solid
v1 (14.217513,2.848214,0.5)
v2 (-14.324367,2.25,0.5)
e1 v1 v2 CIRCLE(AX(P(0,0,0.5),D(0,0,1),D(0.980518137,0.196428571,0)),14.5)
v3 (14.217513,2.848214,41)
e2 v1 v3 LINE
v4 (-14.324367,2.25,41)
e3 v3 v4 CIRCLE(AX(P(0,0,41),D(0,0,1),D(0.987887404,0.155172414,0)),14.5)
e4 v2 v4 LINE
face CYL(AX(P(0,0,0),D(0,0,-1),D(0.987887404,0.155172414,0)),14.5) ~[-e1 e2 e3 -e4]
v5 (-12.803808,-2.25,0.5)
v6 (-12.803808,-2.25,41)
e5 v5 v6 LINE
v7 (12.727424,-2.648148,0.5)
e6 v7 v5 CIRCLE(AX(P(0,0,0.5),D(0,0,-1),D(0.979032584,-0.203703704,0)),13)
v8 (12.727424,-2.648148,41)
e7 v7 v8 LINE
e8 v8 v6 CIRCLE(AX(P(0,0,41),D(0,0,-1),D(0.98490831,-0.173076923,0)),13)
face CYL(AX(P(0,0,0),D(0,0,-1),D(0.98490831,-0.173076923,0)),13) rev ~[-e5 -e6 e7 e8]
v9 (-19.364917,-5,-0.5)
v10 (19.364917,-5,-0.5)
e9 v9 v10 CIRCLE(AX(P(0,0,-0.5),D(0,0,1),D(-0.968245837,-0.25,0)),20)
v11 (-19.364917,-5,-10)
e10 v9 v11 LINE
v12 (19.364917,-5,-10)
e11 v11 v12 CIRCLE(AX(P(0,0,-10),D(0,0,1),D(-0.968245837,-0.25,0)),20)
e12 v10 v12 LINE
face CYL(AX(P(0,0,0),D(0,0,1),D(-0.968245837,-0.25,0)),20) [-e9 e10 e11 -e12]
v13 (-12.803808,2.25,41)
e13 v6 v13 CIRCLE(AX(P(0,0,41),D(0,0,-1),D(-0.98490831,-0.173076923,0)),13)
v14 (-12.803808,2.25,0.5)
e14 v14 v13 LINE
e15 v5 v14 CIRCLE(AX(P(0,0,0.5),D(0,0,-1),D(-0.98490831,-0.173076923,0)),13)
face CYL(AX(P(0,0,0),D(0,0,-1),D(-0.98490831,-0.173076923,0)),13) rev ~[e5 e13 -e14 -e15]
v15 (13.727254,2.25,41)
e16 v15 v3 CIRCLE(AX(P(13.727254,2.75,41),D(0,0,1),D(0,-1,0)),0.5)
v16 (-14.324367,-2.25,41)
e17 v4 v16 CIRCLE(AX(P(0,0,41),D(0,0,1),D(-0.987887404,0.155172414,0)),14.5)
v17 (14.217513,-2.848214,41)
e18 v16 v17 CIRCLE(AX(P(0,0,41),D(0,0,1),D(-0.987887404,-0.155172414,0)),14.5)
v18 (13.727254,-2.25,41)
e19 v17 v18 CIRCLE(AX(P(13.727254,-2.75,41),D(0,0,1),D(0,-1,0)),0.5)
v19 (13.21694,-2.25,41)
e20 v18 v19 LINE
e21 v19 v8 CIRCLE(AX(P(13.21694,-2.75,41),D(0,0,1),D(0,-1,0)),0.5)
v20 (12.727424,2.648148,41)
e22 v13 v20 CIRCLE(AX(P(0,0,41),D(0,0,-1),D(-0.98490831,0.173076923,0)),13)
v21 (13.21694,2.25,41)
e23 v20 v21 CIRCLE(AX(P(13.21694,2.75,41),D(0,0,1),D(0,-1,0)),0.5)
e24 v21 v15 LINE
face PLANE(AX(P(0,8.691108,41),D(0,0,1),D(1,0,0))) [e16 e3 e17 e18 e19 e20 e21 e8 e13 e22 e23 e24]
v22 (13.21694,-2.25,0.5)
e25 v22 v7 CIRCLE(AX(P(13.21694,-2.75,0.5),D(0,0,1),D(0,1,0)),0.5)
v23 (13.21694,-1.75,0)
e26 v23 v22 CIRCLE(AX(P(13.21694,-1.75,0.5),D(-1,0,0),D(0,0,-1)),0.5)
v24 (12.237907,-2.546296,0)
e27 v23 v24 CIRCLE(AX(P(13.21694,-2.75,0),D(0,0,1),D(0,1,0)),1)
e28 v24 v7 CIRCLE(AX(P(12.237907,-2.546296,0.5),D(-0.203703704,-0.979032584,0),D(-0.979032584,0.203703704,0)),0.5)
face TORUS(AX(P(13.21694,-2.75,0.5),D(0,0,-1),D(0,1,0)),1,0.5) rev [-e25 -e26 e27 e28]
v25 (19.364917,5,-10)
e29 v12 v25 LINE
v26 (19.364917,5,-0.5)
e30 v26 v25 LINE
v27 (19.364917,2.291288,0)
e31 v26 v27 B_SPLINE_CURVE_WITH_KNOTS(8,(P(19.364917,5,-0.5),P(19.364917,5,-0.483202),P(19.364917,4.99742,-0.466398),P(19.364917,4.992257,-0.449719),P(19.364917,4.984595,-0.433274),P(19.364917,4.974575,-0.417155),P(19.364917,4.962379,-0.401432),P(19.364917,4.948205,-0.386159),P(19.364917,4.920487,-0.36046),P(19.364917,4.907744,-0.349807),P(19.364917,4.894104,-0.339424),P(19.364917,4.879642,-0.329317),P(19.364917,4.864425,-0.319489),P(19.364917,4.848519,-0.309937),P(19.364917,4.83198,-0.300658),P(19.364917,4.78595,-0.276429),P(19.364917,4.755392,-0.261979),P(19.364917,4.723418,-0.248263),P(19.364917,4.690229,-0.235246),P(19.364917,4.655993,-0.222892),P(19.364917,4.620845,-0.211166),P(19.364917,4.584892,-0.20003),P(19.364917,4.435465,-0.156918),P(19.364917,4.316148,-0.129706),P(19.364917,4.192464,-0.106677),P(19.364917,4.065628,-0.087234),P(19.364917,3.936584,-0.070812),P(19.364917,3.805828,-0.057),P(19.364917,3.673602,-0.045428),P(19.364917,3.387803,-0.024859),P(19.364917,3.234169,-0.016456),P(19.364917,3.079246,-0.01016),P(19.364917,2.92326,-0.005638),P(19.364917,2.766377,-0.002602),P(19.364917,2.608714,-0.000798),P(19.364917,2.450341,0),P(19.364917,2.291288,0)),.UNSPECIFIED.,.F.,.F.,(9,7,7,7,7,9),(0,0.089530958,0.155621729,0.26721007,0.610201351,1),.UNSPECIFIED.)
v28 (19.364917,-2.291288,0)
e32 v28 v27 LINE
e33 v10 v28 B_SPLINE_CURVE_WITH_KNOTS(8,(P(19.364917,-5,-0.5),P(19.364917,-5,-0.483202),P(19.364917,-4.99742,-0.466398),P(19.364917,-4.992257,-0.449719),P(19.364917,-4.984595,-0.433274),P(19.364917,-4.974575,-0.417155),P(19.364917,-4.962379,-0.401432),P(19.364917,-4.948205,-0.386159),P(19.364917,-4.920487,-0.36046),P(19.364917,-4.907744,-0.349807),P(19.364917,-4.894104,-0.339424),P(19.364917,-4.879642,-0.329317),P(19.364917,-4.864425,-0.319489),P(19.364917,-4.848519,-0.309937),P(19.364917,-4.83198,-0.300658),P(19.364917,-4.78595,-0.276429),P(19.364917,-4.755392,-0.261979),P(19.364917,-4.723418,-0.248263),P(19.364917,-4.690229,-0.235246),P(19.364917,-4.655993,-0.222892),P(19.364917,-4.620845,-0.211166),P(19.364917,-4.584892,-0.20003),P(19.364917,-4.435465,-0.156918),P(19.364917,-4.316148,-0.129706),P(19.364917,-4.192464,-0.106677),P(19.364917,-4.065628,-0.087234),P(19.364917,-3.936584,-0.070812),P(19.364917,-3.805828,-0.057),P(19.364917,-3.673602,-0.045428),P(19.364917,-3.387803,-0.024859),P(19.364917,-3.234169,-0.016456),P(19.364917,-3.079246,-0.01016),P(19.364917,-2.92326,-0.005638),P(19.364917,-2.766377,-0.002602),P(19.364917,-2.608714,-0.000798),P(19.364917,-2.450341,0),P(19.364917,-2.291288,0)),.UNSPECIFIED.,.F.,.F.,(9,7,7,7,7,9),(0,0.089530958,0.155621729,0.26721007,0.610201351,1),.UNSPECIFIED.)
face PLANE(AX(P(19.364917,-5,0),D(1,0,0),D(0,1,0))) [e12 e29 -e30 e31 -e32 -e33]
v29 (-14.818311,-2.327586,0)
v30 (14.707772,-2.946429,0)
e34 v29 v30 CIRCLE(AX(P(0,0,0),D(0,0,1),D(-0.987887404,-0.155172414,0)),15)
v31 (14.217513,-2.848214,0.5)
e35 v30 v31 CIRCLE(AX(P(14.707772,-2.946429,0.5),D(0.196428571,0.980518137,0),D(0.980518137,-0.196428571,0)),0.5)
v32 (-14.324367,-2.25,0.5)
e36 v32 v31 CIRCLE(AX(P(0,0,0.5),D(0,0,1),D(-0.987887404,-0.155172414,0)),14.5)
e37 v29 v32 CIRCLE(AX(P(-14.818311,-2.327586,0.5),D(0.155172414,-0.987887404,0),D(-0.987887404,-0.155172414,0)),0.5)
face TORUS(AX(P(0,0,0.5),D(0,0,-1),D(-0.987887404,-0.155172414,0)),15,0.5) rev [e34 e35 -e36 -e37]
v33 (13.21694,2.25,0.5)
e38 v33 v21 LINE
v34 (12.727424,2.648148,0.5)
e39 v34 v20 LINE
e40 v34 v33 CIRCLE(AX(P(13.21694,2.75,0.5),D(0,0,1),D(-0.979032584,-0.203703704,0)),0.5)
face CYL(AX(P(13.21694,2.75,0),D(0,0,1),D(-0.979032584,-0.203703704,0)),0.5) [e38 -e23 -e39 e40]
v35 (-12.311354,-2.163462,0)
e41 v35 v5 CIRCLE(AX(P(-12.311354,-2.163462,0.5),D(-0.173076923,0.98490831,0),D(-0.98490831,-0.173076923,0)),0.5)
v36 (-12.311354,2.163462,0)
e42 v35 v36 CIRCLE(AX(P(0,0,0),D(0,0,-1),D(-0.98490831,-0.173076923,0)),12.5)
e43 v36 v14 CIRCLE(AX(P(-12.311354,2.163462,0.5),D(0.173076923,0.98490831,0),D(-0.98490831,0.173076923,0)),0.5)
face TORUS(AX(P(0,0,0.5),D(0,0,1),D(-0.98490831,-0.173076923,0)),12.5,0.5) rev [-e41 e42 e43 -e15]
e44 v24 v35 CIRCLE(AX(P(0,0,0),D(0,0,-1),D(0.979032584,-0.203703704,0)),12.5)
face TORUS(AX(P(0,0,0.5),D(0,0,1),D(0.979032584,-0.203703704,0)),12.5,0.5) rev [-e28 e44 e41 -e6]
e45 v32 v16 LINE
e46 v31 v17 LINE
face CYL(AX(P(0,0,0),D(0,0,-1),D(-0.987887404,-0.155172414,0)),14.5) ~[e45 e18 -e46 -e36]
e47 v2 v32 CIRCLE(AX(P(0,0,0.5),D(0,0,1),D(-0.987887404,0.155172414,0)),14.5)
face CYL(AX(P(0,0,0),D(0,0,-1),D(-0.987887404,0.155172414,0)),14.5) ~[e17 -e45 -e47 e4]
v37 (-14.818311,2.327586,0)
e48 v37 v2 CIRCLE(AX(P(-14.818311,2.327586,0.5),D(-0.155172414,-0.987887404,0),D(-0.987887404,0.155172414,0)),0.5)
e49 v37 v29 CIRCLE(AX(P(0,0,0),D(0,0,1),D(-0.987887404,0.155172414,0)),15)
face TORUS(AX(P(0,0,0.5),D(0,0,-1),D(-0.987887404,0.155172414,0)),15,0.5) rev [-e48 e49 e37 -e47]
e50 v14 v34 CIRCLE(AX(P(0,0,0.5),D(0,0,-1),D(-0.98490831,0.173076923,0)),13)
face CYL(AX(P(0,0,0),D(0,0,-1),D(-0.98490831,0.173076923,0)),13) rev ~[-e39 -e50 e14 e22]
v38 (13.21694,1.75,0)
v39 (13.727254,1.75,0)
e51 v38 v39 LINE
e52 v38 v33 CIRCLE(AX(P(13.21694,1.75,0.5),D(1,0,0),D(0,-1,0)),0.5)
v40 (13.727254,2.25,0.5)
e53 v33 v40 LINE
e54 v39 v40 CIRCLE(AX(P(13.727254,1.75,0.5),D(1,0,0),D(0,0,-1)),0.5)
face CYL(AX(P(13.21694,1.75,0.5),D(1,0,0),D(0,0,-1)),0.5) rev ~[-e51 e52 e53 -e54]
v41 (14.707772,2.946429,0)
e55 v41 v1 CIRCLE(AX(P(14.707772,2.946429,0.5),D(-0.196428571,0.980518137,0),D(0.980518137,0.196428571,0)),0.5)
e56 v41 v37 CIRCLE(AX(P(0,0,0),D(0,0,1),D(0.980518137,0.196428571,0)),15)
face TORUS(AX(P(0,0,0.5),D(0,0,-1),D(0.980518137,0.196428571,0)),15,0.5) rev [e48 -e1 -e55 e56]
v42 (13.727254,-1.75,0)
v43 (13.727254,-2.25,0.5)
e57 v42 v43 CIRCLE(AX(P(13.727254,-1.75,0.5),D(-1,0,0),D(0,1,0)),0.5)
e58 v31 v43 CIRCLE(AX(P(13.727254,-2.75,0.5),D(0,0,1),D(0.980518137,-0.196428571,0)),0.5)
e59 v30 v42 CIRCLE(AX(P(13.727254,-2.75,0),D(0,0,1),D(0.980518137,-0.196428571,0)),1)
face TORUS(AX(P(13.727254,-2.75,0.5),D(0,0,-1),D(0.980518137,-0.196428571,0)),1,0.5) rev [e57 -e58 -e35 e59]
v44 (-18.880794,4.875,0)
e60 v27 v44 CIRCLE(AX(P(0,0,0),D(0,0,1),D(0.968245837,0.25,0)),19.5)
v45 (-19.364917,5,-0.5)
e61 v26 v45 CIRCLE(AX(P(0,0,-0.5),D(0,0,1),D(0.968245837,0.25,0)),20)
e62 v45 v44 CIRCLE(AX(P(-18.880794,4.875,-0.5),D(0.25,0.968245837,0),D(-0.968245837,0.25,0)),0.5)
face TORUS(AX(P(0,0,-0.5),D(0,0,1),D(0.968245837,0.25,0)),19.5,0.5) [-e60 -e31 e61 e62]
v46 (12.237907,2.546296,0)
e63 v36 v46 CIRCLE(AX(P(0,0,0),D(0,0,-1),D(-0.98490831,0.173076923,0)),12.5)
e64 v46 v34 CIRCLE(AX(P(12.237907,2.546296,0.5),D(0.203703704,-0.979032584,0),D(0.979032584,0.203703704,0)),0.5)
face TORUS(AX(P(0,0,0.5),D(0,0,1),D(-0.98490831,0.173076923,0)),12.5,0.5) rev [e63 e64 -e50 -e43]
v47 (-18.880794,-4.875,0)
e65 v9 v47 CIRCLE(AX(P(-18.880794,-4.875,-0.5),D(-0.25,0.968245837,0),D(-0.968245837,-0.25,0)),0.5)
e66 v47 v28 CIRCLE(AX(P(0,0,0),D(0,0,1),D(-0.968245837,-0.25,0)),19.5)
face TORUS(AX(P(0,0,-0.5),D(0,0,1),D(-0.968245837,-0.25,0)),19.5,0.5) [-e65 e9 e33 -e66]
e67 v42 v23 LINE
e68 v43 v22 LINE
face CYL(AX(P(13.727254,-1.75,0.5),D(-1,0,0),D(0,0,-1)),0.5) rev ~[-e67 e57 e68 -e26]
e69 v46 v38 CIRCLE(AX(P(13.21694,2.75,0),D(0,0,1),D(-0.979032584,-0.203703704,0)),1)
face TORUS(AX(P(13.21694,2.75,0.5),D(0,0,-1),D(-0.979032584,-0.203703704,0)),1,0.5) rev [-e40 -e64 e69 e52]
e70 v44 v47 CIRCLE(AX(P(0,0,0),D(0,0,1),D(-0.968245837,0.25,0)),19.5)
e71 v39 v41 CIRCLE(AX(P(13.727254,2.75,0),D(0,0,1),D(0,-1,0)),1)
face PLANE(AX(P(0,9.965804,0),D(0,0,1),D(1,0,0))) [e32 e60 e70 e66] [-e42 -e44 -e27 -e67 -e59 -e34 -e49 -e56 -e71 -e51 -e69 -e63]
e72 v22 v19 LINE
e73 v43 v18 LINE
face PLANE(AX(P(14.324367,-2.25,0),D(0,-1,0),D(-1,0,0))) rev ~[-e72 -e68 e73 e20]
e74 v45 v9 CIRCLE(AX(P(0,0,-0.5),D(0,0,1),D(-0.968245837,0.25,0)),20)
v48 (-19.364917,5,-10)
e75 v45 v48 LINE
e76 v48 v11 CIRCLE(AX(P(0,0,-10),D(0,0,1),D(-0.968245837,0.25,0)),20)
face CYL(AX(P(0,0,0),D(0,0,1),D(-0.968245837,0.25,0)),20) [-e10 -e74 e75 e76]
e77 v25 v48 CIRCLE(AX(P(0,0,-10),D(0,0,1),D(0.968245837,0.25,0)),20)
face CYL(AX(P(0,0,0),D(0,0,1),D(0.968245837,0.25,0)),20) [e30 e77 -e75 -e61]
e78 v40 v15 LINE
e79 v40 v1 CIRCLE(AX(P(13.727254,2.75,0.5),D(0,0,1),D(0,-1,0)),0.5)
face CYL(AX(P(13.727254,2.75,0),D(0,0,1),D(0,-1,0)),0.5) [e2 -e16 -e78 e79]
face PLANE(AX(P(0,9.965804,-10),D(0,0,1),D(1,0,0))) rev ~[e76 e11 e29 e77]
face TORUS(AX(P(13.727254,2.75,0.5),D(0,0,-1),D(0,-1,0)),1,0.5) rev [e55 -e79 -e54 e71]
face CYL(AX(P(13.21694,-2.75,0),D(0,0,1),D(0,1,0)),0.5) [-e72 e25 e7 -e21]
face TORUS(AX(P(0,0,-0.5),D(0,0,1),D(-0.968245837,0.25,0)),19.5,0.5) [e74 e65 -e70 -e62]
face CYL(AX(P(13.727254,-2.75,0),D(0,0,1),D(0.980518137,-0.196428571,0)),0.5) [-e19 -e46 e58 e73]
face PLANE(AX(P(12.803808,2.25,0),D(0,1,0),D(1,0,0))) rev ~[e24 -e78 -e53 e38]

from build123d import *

# Parameters (mm, degrees)
F0_W     = 38.7298334621
F0_H     = 10
F1_DEPTH = 10
F3_DEPTH = 41
F4_F1_R  = 0.5
F4_F2_R  = 0.5


with BuildPart() as f1:
    # F0 (on Top) → F1 (new body)
    with BuildSketch(Plane.XY):
        with BuildLine():
            Line((-19.364916731, 5), (19.364916731, 5))
            ThreePointArc((19.364916731, 5), (0, 20), (-19.364916731, 5))
        make_face()
        Rectangle(F0_W, F0_H)
        with BuildLine():
            ThreePointArc((-19.364916731, -5), (0, -20), (19.364916731, -5))
            Line((19.364916731, -5), (-19.364916731, -5))
        make_face()
        with BuildLine():
            Line((-19.364916731, -5), (-19.364916731, 5))
            ThreePointArc((-19.364916731, 5), (-20, 0), (-19.364916731, -5))
        make_face()
    extrude(amount=-F1_DEPTH)

    # F2 (on face) → F3 (join)
    with BuildSketch(Plane.XY):
        with BuildLine():
            ThreePointArc((-12.8038080273, 2.25), (0, 13), (12.8038080273, 2.25))
            Line((12.8038080273, 2.25), (14.3243673508, 2.25))
            ThreePointArc((14.3243673508, 2.25), (0, 14.5), (-14.3243673508, 2.25))
            Line((-14.3243673508, 2.25), (-12.8038080273, 2.25))
        make_face()
        with BuildLine():
            Line((14.3243673508, -2.25), (12.8038080273, -2.25))
            ThreePointArc((12.8038080273, -2.25), (0, -13), (-12.8038080273, -2.25))
            Line((-12.8038080273, -2.25), (-14.3243673508, -2.25))
            ThreePointArc((-14.3243673508, -2.25), (0, -14.5), (14.3243673508, -2.25))
        make_face()
        with BuildLine():
            ThreePointArc((-12.8038080273, -2.25), (-13, 0), (-12.8038080273, 2.25))
            Line((-12.8038080273, 2.25), (-14.3243673508, 2.25))
            ThreePointArc((-14.3243673508, 2.25), (-14.5, 0), (-14.3243673508, -2.25))
            Line((-14.3243673508, -2.25), (-12.8038080273, -2.25))
        make_face()
    extrude(amount=F3_DEPTH)

    # F4: fillet of radius 0.5 on 7 edges, made by hand

    # F4_f1
    f4_f1_edges = [f1.edges().sort_by_distance(p)[0] for p in [
        (-20, 0, 0),
        (12.8038080273, 2.25, 20.5),
        (12.8038080273, -2.25, 20.5),
        (14.3243673508, 2.25, 20.5),
        (14.3243673508, -2.25, 20.5),
    ]]
    fillet(f4_f1_edges, radius=F4_F1_R)

    # F4_f2
    f4_f2_edges = [f1.edges().sort_by_distance(p)[0] for p in [
        (-14.5, 0, 0),
        (-13, 0, 0),
        (12.9014449798, -2.3621044432, 0),
        (12.9014449798, 2.3621044432, 0),
        (14.1139754816, 2.4330671545, 0),
        (14.1139754816, -2.4330671545, 0),
    ]]
    fillet(f4_f2_edges, radius=F4_F2_R)


solid = f1.part
